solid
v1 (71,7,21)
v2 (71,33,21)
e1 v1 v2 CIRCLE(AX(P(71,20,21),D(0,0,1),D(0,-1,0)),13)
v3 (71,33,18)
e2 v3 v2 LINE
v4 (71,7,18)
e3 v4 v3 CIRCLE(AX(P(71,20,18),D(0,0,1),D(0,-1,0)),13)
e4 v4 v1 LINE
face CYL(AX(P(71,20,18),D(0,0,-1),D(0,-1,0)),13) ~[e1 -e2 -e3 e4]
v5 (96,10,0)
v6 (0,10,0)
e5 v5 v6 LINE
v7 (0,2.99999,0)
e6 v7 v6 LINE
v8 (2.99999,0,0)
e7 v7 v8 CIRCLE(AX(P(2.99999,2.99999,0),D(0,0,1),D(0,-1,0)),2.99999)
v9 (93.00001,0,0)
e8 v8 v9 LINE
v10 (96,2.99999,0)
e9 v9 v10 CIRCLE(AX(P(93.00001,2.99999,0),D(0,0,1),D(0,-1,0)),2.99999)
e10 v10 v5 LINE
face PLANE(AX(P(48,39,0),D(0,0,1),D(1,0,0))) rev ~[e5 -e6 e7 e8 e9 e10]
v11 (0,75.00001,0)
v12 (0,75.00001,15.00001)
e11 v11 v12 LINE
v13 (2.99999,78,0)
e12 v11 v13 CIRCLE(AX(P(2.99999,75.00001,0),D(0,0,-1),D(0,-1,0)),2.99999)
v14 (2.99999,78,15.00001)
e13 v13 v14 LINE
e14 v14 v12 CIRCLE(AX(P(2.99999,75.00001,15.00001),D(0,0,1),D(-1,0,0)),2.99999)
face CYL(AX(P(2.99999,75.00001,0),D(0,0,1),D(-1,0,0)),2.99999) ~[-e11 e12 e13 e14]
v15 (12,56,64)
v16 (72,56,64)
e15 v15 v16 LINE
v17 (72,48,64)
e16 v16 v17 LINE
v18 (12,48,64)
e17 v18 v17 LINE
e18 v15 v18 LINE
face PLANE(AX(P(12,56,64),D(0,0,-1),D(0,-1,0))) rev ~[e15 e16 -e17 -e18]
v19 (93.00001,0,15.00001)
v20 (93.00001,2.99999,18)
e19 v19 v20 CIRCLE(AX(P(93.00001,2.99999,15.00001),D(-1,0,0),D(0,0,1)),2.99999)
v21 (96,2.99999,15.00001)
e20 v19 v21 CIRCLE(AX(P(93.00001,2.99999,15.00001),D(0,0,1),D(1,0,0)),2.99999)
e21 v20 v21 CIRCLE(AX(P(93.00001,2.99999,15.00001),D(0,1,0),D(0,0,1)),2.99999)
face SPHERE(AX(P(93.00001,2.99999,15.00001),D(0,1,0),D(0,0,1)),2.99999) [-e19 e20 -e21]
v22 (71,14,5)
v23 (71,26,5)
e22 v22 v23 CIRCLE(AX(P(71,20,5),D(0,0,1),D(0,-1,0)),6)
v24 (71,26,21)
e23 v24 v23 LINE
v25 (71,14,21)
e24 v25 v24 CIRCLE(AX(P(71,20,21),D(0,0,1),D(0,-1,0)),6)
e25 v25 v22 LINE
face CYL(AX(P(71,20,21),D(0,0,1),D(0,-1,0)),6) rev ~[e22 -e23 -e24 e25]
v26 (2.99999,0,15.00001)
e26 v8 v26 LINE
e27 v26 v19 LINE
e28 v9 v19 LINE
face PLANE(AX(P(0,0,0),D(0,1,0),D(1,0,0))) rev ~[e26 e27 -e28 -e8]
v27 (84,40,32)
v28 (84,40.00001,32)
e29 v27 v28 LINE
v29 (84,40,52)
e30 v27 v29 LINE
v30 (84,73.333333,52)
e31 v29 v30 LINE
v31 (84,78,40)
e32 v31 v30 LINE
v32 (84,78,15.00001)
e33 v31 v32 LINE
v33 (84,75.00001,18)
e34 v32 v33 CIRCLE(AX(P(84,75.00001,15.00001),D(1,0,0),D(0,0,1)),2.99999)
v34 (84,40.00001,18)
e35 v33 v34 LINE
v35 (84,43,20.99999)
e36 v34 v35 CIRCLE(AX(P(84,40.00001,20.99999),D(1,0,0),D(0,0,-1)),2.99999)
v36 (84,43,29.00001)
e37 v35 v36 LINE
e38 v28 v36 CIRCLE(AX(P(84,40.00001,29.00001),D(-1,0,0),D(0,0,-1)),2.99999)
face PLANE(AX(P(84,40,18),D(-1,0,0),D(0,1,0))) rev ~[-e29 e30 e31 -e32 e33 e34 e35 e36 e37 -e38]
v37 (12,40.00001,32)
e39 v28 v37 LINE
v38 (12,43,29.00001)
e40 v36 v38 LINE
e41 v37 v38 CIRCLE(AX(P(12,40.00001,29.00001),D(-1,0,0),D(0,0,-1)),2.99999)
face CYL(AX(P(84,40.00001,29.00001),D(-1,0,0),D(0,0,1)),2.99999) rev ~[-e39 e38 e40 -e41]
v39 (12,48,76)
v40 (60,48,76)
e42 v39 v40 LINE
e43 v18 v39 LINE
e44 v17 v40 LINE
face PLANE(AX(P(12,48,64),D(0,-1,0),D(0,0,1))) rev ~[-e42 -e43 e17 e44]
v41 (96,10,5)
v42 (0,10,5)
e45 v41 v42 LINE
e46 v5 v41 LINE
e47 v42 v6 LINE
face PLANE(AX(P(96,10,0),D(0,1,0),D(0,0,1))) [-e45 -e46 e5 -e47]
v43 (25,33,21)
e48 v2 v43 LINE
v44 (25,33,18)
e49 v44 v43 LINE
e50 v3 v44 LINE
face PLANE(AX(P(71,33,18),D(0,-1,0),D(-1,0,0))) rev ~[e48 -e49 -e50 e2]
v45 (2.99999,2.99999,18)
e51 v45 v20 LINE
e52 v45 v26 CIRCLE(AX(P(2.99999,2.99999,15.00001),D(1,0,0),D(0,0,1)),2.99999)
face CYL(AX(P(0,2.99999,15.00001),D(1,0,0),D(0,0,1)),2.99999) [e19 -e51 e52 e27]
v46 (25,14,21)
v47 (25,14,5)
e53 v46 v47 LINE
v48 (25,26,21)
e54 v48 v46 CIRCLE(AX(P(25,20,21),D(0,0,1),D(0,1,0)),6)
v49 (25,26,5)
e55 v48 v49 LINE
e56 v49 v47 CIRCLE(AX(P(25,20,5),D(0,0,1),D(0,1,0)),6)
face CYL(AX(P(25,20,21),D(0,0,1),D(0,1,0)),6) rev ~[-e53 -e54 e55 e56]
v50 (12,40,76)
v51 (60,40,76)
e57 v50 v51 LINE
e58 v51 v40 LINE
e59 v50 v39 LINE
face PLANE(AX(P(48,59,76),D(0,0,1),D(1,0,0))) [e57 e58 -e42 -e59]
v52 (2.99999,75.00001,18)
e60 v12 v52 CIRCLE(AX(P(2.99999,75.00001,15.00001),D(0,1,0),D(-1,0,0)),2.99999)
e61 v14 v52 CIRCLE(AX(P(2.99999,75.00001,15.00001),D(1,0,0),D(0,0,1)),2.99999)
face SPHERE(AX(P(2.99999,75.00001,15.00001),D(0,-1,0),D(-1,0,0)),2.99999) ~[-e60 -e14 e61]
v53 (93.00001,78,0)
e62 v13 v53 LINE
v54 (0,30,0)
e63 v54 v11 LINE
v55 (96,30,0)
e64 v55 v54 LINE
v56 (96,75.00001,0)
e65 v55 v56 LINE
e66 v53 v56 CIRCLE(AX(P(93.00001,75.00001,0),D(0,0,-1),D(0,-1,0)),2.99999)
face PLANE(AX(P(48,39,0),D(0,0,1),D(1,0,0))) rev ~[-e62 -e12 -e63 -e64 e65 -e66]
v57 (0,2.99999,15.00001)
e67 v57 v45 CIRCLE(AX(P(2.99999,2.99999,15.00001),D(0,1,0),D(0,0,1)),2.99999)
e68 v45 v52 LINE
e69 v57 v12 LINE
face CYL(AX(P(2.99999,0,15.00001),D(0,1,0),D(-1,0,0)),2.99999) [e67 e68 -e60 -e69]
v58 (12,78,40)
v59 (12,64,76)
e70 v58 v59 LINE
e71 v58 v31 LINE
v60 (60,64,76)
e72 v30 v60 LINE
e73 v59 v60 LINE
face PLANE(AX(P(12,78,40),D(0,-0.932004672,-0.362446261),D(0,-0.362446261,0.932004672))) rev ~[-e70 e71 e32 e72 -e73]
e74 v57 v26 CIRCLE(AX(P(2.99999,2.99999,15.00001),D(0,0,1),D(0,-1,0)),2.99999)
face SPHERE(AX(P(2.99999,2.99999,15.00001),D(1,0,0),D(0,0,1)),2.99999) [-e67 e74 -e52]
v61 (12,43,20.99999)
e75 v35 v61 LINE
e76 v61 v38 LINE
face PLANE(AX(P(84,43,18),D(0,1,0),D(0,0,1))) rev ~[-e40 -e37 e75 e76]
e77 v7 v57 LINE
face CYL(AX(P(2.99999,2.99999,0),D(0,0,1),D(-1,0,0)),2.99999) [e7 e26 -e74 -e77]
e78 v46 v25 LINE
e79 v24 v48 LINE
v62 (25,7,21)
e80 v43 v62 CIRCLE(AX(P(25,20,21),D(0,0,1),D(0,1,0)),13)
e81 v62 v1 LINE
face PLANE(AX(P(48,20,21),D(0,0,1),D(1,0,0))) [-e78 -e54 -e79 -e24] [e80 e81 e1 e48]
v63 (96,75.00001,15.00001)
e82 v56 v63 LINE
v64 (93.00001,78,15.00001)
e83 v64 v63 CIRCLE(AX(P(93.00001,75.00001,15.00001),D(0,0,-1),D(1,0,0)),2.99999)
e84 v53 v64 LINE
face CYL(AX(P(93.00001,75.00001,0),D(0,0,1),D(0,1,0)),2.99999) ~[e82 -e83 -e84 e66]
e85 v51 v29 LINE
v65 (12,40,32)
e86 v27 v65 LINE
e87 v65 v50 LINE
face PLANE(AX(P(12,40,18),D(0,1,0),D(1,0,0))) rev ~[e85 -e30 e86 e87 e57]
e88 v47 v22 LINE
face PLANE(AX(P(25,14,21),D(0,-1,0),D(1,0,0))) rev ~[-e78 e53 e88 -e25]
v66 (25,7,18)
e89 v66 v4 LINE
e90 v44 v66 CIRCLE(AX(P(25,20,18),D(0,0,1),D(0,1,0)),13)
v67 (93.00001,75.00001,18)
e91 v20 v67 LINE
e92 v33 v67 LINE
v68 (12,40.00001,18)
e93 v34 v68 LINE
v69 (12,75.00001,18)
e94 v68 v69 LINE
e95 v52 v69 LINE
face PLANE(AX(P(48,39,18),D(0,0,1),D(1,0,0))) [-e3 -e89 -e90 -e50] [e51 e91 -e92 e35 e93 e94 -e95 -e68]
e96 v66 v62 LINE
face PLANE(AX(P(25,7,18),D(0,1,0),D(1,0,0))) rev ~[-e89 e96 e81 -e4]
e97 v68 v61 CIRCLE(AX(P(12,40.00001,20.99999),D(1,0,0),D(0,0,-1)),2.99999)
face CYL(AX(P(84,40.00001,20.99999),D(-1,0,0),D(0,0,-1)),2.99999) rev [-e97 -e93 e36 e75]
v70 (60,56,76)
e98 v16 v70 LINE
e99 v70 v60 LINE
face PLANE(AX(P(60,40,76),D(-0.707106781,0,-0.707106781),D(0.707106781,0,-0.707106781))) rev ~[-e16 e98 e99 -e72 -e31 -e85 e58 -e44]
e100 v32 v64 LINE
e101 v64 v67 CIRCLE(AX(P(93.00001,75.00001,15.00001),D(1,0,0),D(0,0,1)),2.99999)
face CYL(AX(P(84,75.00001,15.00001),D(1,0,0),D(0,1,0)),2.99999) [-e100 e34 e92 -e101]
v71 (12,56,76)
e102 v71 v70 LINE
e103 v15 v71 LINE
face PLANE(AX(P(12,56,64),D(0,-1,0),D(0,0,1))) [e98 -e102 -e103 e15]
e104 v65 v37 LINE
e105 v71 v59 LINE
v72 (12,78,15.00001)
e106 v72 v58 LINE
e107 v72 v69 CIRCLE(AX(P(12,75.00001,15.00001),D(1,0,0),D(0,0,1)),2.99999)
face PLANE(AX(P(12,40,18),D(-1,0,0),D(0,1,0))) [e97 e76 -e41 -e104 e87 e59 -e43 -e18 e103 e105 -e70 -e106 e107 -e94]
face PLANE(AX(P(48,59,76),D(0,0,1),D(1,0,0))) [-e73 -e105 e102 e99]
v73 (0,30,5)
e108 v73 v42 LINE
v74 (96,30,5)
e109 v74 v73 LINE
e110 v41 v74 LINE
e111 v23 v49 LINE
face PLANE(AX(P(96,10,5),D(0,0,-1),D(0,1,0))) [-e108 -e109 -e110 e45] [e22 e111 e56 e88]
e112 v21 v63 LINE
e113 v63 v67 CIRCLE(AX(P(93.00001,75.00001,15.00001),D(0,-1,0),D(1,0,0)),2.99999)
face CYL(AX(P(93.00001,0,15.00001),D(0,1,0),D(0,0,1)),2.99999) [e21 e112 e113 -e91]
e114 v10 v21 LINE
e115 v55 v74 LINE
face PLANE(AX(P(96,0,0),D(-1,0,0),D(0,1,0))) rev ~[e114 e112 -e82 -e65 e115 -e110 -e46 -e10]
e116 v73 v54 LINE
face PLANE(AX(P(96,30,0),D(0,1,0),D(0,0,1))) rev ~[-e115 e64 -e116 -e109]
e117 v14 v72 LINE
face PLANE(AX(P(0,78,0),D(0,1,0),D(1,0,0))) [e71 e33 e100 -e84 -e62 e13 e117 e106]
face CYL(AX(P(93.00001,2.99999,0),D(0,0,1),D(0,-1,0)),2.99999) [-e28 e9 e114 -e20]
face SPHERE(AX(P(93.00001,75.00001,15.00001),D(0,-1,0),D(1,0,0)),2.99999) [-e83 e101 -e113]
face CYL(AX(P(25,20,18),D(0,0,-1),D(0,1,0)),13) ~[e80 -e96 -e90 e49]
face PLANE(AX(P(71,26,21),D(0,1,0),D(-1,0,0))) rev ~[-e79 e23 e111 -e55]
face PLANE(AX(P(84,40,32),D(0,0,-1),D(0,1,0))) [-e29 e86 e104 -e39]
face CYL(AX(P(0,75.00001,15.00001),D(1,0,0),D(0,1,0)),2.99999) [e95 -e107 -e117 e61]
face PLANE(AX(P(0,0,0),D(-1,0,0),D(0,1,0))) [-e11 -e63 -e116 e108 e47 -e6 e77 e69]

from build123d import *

# Parameters (mm, degrees)
F0_W      = 96
F0_H      = 78
F1_DEPTH  = 18
F2_W      = 72
F2_H      = 38
F4_DEPTH  = 58
F6_DEPTH  = 38
F8_DEPTH  = 72.001
F9_W      = 8
F9_H      = 12
F10_DEPTH = 60.001
F12_DEPTH = 3
F14_DEPTH = 21
F15_W     = 20
F15_H     = 5
F16_DEPTH = 96.001
F17_W     = 3
F17_H     = 14
F18_DEPTH = 72
F19_R     = 2.99999


# Not quite as in the source:
# - a fillet or chamfer is up to 0.001 mm smaller than in the source, because OpenCascade refuses the exact size


with BuildPart() as f1:
    # F0 (on Top) → F1 (new body)
    with BuildSketch(Plane.XY):
        with Locations((48, 39)):
            Rectangle(F0_W, F0_H)
    extrude(amount=F1_DEPTH)

    # F2 (on face) → F4 (join, through all)
    with BuildSketch(Plane.XY.offset(18)):
        with Locations((48, 59)):
            Rectangle(F2_W, F2_H)
    extrude(amount=F4_DEPTH)

    # F5 (on face) → F6 (cut, through all)
    with BuildSketch(Plane.XZ.offset(-40)):
        Polygon((84, 76), (60, 76), (84, 52), align=None)
    extrude(amount=-F6_DEPTH, mode=Mode.SUBTRACT)

    # F7 (on face) → F8 (cut, through all)
    with BuildSketch(Plane(origin=(12, 0, 0), x_dir=(0, -1, 0), z_dir=(-1, 0, 0))):
        Polygon((-78, 76), (-78, 40), (-64, 76), align=None)
    extrude(amount=-F8_DEPTH, mode=Mode.SUBTRACT)

    # F9 (on face) → F10 (cut, through all)
    with BuildSketch(Plane(origin=(12, 0, 0), x_dir=(0, -1, 0), z_dir=(-1, 0, 0))):
        with Locations((-52, 70)):
            Rectangle(F9_W, F9_H)
    extrude(amount=-F10_DEPTH, mode=Mode.SUBTRACT)

    # F11 (on face) → F12 (join)
    with BuildSketch(Plane.XY.offset(18)):
        with BuildLine():
            Line((71, 33), (25, 33))
            ThreePointArc((25, 33), (12, 20), (25, 7))
            Line((25, 7), (71, 7))
            ThreePointArc((71, 7), (84, 20), (71, 33))
        make_face()
    extrude(amount=F12_DEPTH)

    # F13 (on face) → F14 (cut, through all)
    with BuildSketch(Plane.XY.offset(21)):
        with BuildLine():
            Line((71, 26), (25, 26))
            ThreePointArc((25, 26), (19, 20), (25, 14))
            Line((25, 14), (71, 14))
            ThreePointArc((71, 14), (77, 20), (71, 26))
        make_face()
    extrude(amount=-F14_DEPTH, mode=Mode.SUBTRACT)

    # F15 (on face) → F16 (cut, through all)
    with BuildSketch(Plane.YZ.offset(96)):
        with Locations((20, 2.5)):
            Rectangle(F15_W, F15_H)
    extrude(amount=-F16_DEPTH, mode=Mode.SUBTRACT)

    # F17 (on face) → F18 (cut, through all)
    with BuildSketch(Plane.YZ.offset(84)):
        with Locations((41.5, 25)):
            Rectangle(F17_W, F17_H)
    extrude(amount=-F18_DEPTH, mode=Mode.SUBTRACT)

    # F19 (radius 3 in the source; OpenCascade refuses exactly that, so slightly less here)
    f19_edges = [f1.edges().sort_by_distance(p)[0] for p in [
        (48, 43, 18),
        (48, 43, 32),
        (96, 39, 18),
        (48, 0, 18),
        (96, 0, 9),
        (96, 78, 9),
        (90, 78, 18),
        (0, 39, 18),
        (0, 0, 9),
        (0, 78, 9),
        (6, 78, 18),
    ]]
    fillet(f19_edges, radius=F19_R)


solid = f1.part
